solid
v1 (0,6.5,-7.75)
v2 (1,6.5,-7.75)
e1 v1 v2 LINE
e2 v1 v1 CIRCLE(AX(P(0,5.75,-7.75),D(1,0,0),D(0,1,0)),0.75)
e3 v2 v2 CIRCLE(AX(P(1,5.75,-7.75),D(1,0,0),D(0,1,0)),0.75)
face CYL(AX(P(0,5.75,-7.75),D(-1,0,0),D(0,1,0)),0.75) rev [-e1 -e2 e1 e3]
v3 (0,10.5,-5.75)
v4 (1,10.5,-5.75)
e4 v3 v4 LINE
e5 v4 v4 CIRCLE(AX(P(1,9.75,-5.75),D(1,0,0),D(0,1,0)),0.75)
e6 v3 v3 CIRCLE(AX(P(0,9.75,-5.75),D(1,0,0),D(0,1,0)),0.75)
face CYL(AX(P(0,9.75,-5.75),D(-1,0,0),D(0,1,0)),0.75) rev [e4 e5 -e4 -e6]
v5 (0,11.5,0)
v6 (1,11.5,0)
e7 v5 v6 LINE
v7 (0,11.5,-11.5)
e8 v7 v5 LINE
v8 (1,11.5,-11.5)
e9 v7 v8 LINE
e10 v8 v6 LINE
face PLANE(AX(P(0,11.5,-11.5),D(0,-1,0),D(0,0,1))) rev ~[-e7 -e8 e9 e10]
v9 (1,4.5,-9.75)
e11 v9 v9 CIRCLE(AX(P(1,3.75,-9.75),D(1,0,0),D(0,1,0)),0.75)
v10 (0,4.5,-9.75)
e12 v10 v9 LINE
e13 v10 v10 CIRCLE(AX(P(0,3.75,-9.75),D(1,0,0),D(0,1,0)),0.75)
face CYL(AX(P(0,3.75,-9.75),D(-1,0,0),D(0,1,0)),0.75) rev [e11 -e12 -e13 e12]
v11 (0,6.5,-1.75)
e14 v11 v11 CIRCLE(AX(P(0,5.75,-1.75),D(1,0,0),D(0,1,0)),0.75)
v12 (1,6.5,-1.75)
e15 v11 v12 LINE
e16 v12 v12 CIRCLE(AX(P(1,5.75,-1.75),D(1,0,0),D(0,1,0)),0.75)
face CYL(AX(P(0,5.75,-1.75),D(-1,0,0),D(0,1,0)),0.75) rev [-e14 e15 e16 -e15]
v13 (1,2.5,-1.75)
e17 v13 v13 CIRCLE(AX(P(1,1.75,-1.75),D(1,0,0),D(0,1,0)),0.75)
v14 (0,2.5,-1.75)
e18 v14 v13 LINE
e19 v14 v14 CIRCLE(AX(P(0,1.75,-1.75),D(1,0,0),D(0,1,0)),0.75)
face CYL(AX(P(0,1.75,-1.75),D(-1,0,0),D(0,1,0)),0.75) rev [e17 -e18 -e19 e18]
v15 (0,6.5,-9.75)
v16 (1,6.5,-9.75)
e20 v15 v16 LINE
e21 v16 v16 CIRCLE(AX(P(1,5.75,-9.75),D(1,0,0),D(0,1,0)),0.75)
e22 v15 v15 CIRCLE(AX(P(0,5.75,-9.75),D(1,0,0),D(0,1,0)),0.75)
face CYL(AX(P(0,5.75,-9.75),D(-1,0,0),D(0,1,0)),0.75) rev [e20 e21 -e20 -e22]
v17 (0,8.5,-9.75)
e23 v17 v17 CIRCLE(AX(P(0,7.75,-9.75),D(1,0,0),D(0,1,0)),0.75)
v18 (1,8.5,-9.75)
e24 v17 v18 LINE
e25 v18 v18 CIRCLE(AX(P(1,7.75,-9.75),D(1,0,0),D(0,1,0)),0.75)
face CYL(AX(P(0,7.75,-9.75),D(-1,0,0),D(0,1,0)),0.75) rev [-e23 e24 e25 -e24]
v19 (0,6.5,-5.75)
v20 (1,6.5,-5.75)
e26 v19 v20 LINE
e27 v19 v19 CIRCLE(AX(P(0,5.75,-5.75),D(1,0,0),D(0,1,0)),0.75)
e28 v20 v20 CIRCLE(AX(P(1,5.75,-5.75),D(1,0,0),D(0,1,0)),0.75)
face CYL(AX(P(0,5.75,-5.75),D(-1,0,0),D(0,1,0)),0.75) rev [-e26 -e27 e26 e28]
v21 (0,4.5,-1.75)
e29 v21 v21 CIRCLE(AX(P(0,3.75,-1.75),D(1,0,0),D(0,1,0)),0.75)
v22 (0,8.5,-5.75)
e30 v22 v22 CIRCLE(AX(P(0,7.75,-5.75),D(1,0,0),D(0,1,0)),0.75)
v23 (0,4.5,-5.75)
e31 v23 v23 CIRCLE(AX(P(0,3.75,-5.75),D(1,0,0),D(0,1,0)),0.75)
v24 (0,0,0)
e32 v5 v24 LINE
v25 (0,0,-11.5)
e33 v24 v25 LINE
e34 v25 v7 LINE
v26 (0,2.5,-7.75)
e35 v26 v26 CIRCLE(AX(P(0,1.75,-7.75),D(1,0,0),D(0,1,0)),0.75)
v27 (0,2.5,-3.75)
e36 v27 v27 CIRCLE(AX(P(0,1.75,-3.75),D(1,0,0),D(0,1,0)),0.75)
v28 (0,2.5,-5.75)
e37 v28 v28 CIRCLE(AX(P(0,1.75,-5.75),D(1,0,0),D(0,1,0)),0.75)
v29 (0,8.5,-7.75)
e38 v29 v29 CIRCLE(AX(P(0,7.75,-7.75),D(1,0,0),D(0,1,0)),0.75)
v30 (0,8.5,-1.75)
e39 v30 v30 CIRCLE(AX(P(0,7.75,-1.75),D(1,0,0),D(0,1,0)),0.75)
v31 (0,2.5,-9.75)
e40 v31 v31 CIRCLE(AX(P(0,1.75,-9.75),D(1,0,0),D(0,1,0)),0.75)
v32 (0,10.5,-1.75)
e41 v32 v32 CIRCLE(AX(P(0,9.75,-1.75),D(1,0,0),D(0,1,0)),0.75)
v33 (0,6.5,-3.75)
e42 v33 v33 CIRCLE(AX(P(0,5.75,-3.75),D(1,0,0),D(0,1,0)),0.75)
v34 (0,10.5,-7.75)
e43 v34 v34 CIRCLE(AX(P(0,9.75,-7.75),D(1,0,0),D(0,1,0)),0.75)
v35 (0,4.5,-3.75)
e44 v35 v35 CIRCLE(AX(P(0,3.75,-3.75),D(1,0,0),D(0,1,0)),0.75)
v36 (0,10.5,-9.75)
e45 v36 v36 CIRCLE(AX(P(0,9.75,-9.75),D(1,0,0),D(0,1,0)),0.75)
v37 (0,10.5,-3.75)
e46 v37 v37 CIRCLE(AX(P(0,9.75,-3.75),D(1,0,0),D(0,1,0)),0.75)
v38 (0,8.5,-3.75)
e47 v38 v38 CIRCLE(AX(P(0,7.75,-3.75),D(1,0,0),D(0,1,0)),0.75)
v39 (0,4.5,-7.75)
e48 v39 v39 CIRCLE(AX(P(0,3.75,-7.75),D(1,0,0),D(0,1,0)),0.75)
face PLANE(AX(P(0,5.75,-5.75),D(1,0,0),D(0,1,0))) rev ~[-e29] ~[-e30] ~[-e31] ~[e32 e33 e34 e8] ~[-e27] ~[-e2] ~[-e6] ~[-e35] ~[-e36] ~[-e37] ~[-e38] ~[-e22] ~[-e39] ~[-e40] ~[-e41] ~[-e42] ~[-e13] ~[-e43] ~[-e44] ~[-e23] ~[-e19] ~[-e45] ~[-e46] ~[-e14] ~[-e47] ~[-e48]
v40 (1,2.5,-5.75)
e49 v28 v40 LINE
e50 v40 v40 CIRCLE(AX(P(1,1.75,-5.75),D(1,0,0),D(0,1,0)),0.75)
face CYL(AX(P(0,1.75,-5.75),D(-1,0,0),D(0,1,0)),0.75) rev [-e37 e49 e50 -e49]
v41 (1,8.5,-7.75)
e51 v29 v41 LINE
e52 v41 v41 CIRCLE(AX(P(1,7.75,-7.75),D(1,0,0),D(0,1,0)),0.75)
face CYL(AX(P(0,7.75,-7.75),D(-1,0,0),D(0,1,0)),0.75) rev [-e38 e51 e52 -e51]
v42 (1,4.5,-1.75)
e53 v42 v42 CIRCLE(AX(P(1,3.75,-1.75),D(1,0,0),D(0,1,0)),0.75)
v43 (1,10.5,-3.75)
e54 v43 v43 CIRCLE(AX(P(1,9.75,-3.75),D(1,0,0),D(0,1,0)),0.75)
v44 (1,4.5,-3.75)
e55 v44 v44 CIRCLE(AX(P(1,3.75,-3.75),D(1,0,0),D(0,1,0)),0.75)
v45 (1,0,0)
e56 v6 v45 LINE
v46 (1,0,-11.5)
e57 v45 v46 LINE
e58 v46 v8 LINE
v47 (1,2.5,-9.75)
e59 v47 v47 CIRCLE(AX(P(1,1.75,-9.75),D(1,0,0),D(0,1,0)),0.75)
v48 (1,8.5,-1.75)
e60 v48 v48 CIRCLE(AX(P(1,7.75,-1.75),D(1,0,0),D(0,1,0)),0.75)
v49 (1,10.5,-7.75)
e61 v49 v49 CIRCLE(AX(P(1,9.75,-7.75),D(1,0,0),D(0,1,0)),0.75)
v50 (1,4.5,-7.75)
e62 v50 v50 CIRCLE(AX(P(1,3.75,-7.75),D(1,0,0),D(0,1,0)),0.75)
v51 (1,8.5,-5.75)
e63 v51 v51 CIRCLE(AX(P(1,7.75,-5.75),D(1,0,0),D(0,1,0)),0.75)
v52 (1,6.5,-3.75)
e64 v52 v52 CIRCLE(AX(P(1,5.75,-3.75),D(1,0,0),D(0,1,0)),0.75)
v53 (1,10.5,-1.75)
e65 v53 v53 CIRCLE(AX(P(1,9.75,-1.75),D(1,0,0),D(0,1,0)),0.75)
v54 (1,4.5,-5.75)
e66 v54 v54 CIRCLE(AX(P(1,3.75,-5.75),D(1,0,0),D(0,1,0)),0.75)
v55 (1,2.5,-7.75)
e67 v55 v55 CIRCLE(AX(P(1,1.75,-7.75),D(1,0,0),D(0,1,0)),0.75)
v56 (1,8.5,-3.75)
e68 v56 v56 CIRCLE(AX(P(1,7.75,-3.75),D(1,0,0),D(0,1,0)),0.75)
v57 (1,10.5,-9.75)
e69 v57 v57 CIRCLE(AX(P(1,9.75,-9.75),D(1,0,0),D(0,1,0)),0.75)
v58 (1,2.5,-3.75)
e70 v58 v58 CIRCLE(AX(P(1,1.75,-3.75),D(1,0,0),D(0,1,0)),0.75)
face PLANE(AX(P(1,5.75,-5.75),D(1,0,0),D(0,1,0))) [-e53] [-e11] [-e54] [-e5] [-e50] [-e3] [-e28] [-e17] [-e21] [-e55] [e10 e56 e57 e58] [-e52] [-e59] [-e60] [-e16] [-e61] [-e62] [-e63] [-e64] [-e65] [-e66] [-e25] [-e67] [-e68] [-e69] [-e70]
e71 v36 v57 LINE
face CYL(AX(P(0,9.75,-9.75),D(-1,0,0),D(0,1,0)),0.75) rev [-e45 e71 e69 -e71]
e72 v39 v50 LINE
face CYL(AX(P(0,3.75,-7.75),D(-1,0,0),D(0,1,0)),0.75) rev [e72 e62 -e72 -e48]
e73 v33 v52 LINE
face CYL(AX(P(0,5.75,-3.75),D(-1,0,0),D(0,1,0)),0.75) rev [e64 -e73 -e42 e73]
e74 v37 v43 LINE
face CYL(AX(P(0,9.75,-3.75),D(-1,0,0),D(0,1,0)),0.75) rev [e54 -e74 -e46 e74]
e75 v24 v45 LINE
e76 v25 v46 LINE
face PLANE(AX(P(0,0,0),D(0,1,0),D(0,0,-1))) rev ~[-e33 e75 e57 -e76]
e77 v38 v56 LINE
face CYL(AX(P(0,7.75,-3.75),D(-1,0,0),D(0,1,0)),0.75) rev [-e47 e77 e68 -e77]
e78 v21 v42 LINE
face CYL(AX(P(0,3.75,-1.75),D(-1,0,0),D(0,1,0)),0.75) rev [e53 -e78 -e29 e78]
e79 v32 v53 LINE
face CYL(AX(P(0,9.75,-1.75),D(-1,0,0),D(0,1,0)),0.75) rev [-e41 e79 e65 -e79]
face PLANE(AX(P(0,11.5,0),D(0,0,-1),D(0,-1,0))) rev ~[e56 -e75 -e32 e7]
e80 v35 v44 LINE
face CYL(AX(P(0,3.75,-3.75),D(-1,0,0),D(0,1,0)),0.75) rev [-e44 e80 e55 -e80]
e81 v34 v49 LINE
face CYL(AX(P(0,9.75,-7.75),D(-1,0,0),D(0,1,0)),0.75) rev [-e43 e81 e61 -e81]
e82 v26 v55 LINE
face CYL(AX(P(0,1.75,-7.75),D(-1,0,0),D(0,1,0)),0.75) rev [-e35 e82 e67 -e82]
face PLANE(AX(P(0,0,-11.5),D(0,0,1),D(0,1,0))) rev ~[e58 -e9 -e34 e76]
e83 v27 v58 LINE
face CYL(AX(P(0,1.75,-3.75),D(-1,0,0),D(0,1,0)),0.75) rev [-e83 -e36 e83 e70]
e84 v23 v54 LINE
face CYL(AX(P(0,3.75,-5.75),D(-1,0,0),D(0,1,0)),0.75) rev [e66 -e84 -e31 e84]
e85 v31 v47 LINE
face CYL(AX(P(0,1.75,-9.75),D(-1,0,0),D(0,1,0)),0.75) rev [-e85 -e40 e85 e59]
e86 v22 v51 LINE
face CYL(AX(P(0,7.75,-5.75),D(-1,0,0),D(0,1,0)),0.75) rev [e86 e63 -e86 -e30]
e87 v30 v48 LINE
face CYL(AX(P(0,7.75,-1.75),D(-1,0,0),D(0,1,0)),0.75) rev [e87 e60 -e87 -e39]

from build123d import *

# Parameters (mm, degrees)
F0_R     = 0.75
F1_DEPTH = 1


# Not quite as in the source:
# - a feature names something its author has since deleted; it is built from what else it names


with BuildPart() as f1:
    # F0 (on Right) → F1 (new body)
    with BuildSketch(Plane.YZ):
        Polygon((8.384144865, 0), (0, 0), (0, -11.5), (11.5, -11.5), (11.5, 0), (10.38414, 0), (9.5, 0), align=None)
        with Locations((1.75, -9.75)):
            Circle(F0_R, mode=Mode.SUBTRACT)
        with Locations((1.75, -7.75)):
            Circle(F0_R, mode=Mode.SUBTRACT)
        with Locations((3.75, -9.75)):
            Circle(F0_R, mode=Mode.SUBTRACT)
        with Locations((3.75, -7.75)):
            Circle(F0_R, mode=Mode.SUBTRACT)
        with Locations((1.75, -5.75)):
            Circle(F0_R, mode=Mode.SUBTRACT)
        with Locations((1.75, -3.75)):
            Circle(F0_R, mode=Mode.SUBTRACT)
        with Locations((1.75, -1.75)):
            Circle(F0_R, mode=Mode.SUBTRACT)
        with Locations((3.75, -5.75)):
            Circle(F0_R, mode=Mode.SUBTRACT)
        with Locations((3.75, -3.75)):
            Circle(F0_R, mode=Mode.SUBTRACT)
        with Locations((3.75, -1.75)):
            Circle(F0_R, mode=Mode.SUBTRACT)
        with Locations((5.75, -9.75)):
            Circle(F0_R, mode=Mode.SUBTRACT)
        with Locations((7.75, -9.75)):
            Circle(F0_R, mode=Mode.SUBTRACT)
        with Locations((5.75, -7.75)):
            Circle(F0_R, mode=Mode.SUBTRACT)
        with Locations((7.75, -7.75)):
            Circle(F0_R, mode=Mode.SUBTRACT)
        with Locations((9.75, -9.75)):
            Circle(F0_R, mode=Mode.SUBTRACT)
        with Locations((9.75, -7.75)):
            Circle(F0_R, mode=Mode.SUBTRACT)
        with Locations((5.75, -5.75)):
            Circle(F0_R, mode=Mode.SUBTRACT)
        with Locations((5.75, -3.75)):
            Circle(F0_R, mode=Mode.SUBTRACT)
        with Locations((7.75, -5.75)):
            Circle(F0_R, mode=Mode.SUBTRACT)
        with Locations((7.75, -3.75)):
            Circle(F0_R, mode=Mode.SUBTRACT)
        with Locations((5.75, -1.75)):
            Circle(F0_R, mode=Mode.SUBTRACT)
        with Locations((7.75, -1.75)):
            Circle(F0_R, mode=Mode.SUBTRACT)
        with Locations((9.75, -5.75)):
            Circle(F0_R, mode=Mode.SUBTRACT)
        with Locations((9.75, -3.75)):
            Circle(F0_R, mode=Mode.SUBTRACT)
        with Locations((9.75, -1.75)):
            Circle(F0_R, mode=Mode.SUBTRACT)
    extrude(amount=F1_DEPTH)


solid = f1.part
